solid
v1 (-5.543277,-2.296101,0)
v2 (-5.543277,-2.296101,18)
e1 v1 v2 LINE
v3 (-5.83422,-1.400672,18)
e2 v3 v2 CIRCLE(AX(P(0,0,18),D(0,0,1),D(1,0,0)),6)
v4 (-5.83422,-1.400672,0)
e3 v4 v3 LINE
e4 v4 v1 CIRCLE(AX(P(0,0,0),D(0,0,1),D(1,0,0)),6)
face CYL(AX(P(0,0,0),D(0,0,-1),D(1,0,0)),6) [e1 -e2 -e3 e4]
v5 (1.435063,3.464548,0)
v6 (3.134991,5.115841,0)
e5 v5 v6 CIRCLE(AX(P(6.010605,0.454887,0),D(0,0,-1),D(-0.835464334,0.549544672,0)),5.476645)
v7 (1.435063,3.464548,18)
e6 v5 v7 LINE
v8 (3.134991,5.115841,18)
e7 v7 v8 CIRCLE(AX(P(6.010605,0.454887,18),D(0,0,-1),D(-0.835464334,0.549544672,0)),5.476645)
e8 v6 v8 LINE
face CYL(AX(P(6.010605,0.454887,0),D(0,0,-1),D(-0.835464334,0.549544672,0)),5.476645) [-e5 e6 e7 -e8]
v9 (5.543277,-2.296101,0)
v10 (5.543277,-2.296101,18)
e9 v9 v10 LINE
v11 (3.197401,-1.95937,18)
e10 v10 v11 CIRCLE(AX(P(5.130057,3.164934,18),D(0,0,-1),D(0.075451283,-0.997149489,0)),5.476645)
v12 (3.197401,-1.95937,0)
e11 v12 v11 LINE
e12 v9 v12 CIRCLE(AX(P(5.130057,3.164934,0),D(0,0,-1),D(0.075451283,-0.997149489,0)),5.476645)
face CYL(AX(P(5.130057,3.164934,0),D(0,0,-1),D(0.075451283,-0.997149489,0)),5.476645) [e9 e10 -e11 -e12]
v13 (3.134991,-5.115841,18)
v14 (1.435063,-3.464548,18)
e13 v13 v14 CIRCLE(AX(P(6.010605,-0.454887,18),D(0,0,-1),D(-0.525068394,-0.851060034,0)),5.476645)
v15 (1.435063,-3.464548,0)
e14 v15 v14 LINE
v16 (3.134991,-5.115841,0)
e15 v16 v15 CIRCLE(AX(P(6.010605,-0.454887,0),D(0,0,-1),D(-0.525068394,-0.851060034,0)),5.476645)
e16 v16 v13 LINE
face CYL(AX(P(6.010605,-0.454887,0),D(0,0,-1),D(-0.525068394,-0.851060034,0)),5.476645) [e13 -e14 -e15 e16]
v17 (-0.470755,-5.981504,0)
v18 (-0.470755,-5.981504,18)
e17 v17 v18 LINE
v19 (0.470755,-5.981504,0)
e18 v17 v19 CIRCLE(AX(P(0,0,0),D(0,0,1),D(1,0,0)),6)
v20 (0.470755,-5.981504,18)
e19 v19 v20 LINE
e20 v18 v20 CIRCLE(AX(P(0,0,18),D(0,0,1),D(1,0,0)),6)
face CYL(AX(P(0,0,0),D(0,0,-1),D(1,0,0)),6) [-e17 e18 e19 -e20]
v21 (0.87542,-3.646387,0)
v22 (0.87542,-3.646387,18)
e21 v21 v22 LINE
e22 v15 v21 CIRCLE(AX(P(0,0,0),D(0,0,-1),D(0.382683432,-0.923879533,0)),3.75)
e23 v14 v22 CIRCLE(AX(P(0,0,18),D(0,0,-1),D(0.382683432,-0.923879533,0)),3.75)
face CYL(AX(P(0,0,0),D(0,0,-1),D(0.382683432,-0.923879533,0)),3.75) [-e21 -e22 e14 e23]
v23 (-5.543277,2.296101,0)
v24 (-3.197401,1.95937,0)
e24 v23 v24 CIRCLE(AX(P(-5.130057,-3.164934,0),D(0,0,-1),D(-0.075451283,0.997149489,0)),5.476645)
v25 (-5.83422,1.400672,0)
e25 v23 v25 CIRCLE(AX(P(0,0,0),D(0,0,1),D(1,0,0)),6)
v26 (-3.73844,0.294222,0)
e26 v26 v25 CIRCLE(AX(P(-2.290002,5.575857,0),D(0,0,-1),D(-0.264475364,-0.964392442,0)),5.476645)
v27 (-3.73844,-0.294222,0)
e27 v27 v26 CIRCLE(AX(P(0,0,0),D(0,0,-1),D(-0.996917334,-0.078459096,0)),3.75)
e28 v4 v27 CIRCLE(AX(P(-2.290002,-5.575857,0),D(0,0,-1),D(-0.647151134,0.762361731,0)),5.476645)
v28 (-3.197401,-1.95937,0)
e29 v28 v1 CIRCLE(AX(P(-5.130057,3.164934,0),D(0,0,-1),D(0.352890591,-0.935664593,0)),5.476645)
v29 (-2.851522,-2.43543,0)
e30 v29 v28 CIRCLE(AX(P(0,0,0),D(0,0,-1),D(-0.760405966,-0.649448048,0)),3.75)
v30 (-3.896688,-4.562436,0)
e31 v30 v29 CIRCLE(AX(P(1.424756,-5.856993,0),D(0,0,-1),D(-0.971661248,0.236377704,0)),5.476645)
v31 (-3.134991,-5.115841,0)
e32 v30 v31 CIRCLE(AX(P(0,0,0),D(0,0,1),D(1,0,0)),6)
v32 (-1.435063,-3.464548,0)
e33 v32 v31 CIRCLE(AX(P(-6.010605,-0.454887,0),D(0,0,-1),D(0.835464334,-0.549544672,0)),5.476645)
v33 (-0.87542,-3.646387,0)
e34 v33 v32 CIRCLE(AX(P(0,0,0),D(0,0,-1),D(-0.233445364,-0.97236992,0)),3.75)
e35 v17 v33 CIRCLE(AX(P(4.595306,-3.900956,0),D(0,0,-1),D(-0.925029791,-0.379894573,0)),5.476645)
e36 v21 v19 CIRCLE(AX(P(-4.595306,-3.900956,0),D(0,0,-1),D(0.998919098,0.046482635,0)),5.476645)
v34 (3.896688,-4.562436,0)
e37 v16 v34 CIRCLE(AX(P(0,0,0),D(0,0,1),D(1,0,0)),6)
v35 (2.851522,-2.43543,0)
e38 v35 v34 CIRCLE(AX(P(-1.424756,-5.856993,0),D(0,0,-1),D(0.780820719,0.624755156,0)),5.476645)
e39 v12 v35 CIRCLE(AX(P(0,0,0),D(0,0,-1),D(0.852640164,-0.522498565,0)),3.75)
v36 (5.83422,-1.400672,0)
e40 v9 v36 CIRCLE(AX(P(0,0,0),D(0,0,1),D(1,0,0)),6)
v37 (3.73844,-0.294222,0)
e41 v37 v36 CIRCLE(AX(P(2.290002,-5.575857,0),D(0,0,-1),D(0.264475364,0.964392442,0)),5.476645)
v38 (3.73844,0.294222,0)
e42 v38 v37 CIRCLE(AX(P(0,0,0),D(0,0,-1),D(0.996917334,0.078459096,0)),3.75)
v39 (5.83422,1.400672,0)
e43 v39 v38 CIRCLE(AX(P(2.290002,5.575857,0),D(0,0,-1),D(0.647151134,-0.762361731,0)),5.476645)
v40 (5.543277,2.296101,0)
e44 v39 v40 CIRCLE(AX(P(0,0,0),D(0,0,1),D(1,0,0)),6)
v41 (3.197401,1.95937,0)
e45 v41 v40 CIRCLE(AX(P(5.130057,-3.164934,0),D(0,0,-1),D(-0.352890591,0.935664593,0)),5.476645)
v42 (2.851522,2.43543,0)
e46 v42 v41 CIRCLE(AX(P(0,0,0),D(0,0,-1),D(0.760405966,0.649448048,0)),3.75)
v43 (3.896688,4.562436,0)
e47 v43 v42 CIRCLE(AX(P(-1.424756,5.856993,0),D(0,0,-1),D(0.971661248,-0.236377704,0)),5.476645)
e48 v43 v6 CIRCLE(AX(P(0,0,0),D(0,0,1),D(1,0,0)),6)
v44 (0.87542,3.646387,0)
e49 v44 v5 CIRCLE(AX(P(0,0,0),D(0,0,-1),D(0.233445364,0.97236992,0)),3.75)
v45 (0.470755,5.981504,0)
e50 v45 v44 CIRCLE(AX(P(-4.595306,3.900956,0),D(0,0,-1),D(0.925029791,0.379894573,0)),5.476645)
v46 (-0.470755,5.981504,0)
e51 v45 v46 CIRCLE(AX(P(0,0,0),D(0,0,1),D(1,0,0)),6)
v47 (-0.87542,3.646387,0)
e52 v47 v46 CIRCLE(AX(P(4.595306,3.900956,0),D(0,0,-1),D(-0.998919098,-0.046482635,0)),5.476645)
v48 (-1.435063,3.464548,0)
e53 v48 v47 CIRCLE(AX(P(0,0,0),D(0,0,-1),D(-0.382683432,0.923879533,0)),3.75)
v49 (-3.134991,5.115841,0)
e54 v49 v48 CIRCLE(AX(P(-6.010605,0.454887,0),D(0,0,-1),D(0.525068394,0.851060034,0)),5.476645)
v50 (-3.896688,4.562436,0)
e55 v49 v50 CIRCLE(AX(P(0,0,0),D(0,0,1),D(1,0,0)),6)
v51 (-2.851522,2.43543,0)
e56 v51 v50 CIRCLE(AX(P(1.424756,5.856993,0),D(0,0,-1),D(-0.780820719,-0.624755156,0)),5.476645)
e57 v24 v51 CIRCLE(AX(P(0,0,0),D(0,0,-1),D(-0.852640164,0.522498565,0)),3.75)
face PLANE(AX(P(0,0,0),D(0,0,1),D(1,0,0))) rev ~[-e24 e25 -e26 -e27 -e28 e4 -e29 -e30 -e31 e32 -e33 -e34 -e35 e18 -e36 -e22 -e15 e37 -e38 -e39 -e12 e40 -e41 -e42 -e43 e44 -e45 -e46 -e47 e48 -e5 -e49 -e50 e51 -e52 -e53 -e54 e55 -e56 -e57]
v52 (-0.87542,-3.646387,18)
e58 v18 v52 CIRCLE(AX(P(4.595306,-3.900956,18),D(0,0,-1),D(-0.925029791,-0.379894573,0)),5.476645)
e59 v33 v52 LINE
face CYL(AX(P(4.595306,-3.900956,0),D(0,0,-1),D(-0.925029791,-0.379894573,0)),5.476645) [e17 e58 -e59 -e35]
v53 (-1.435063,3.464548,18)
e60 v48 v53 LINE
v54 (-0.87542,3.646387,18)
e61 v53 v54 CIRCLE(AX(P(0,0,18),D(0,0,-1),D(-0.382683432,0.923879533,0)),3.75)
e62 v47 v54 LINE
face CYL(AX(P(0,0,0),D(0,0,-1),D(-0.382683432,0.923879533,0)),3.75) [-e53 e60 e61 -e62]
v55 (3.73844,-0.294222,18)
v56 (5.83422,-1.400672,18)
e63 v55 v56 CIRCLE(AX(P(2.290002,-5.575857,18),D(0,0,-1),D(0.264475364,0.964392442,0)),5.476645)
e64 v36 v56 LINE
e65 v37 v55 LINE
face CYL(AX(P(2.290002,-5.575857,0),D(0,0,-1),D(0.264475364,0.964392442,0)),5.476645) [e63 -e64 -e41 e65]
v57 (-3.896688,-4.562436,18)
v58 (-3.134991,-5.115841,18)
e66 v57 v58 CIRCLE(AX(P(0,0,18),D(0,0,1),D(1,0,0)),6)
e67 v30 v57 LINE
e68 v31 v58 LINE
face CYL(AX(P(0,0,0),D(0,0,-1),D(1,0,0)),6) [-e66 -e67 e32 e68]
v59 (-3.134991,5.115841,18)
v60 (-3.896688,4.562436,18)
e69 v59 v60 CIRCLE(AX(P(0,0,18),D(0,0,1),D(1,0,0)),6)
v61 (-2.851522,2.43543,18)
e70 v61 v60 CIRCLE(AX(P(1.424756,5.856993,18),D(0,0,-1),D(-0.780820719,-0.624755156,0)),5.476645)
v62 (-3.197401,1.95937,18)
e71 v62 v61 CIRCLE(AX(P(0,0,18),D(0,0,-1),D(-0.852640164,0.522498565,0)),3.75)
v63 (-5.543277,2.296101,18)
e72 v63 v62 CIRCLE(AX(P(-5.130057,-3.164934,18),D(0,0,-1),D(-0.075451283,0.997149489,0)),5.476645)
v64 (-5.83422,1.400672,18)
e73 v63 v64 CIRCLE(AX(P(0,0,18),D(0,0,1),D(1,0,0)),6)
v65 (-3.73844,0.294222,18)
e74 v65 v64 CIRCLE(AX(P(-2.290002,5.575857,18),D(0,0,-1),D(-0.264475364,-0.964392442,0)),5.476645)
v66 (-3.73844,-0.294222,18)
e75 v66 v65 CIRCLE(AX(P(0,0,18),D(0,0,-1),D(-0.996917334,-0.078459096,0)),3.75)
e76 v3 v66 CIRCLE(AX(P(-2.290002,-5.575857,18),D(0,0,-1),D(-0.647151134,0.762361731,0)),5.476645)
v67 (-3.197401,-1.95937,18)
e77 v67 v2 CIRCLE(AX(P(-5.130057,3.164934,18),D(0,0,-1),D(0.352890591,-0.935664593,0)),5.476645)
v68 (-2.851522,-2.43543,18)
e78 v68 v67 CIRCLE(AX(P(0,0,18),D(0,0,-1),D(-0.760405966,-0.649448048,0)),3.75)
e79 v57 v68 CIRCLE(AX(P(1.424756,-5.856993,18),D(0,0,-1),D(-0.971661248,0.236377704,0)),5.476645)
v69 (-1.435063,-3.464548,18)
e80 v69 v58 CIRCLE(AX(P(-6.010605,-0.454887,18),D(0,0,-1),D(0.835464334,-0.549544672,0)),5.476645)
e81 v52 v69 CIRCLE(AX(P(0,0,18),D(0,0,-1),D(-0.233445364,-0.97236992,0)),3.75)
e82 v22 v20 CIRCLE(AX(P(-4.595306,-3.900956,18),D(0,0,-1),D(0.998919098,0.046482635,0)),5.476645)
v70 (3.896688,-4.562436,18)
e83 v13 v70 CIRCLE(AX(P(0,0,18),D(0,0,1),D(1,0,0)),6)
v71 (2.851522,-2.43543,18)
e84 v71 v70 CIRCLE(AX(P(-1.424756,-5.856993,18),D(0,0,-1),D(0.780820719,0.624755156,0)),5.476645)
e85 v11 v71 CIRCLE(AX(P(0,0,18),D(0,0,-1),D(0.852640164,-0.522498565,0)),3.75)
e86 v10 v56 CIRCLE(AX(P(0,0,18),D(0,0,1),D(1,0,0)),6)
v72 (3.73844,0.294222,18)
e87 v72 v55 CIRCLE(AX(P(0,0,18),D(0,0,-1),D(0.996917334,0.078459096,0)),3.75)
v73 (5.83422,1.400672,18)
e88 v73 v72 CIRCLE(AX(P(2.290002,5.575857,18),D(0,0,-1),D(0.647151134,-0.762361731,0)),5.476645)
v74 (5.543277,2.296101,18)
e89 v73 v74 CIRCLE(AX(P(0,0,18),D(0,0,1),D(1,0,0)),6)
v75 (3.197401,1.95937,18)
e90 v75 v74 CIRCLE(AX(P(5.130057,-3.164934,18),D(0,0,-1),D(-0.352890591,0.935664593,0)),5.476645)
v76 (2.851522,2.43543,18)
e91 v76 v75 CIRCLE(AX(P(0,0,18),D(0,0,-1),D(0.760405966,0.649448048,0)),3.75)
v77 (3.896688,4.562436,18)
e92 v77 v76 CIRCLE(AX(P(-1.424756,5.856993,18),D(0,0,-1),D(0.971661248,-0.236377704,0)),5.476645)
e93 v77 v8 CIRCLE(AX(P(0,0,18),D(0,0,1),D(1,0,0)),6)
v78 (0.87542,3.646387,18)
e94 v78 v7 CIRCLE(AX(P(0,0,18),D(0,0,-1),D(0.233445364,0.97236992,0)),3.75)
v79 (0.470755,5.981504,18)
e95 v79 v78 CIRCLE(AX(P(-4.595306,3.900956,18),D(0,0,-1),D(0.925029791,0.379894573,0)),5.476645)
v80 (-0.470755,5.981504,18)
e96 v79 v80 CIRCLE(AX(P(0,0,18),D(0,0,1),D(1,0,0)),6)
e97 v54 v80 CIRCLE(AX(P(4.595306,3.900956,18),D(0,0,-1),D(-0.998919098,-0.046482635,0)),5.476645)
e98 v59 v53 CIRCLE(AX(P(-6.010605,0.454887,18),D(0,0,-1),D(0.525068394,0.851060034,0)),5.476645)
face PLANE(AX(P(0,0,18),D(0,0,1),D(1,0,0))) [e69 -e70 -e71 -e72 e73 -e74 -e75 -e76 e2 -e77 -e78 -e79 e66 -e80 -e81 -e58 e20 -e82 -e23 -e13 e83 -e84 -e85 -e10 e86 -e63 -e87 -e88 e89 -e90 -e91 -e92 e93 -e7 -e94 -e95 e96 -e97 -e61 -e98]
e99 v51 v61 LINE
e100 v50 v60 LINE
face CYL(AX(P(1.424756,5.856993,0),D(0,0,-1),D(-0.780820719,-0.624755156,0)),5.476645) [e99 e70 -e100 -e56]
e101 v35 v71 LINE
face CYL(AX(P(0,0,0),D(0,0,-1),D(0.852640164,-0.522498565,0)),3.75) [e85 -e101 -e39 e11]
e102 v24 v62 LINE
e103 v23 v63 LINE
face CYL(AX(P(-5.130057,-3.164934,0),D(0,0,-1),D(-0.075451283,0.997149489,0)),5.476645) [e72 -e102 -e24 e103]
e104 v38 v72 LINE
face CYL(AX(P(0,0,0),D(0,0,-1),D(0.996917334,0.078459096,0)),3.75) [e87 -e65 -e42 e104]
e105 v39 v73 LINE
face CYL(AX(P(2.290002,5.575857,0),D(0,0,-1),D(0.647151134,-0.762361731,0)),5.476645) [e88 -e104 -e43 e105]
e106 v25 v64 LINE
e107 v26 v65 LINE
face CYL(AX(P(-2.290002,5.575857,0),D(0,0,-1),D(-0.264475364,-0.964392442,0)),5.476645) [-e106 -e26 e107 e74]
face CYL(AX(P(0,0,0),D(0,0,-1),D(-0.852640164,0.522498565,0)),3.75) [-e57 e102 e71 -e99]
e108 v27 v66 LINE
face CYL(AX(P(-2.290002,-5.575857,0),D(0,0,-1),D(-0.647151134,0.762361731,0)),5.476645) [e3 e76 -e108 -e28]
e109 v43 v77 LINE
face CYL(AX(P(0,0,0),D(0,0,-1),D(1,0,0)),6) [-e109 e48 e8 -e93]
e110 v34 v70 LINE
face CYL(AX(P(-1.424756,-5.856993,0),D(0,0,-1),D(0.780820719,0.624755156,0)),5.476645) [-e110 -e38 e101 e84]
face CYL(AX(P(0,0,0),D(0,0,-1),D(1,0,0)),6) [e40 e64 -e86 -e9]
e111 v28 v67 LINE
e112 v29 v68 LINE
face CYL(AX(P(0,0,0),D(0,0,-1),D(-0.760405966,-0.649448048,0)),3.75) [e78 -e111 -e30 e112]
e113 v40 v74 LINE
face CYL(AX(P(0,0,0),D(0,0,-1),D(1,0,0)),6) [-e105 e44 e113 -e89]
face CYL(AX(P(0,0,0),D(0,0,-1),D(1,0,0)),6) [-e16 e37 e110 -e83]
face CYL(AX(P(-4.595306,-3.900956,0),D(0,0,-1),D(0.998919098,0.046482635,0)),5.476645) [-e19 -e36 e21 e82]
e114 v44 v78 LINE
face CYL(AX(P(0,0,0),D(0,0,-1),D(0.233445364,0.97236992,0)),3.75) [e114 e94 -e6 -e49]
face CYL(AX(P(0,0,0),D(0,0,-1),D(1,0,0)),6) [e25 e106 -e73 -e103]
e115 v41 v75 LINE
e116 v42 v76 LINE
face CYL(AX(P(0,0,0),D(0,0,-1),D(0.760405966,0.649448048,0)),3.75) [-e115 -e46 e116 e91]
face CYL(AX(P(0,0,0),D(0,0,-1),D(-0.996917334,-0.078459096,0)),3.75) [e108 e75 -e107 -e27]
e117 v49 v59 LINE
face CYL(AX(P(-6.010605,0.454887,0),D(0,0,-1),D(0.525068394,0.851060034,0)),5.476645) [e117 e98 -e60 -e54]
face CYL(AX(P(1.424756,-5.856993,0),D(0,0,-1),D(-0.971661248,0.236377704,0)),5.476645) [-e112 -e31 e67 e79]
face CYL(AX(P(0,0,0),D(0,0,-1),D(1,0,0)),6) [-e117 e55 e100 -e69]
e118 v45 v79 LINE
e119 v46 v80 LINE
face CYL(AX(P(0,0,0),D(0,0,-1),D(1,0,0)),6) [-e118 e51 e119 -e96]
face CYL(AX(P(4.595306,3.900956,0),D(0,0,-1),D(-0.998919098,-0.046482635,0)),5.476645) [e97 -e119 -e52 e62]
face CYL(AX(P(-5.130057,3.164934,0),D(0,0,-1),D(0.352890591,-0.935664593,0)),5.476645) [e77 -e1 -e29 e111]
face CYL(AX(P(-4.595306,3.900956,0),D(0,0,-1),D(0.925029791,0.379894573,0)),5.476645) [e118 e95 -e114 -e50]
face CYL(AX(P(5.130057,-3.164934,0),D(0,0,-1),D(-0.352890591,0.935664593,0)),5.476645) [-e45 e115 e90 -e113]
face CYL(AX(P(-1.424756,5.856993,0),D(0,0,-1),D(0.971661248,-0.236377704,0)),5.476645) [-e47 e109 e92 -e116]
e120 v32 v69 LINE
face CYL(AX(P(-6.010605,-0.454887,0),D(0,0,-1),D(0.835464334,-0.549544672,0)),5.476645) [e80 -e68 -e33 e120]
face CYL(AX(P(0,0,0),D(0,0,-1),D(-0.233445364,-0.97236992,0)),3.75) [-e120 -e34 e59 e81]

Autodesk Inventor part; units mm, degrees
sketch "Sketch1" plane through (0, 0, 0) normal (0, 0, 1) x (1, 0, 0)
  circle A0 centre (0, 0) radius 6
  dimension "d0" = 12
extrude "Extrusion1" add sketch "Sketch1" along normal blind 18
ref_plane "Work Plane2" through (0, 0, 9) normal (0, 0, 1) x (1, 0, 0)
sketch "Sketch2" plane through (0, 0, 0) normal (0, 0, -1) x (-1, 0, 0)
  circle A0 centre (0, 0) radius 6 projected
  circle A1 centre (0, 0) radius 5
  dimension "d3" = 10
surface extrude "Pitch Diameter" sketch "Sketch2" against normal through all shown no curves A1
ref_plane "Work Plane8" through (0, 0, 0) normal (0.9510565, 0.309017, 0) x (0, 0, 1)
ref_plane "Work Plane9" through (0, 0, 0) normal (1, 0, 0) x (0, 1, 0)
spur gear teeth "Spur Gear" teeth 10 pitch diameter 10 tip diameter 12 root diameter 7.5 face width 18 start plane through (0, 0, 0) normal (0, 0, -1) x (-1, 0, 0)
equation "\"d0\" = da_da"
equation "\"d1\" = da_b"
equation "\"d3\" = da_d"
equation "\"da_da\" = 12"
equation "\"da_b\" = 18"
equation "\"da_d\" = 10"
properties part number "Spur Gear1" material "Steel"
